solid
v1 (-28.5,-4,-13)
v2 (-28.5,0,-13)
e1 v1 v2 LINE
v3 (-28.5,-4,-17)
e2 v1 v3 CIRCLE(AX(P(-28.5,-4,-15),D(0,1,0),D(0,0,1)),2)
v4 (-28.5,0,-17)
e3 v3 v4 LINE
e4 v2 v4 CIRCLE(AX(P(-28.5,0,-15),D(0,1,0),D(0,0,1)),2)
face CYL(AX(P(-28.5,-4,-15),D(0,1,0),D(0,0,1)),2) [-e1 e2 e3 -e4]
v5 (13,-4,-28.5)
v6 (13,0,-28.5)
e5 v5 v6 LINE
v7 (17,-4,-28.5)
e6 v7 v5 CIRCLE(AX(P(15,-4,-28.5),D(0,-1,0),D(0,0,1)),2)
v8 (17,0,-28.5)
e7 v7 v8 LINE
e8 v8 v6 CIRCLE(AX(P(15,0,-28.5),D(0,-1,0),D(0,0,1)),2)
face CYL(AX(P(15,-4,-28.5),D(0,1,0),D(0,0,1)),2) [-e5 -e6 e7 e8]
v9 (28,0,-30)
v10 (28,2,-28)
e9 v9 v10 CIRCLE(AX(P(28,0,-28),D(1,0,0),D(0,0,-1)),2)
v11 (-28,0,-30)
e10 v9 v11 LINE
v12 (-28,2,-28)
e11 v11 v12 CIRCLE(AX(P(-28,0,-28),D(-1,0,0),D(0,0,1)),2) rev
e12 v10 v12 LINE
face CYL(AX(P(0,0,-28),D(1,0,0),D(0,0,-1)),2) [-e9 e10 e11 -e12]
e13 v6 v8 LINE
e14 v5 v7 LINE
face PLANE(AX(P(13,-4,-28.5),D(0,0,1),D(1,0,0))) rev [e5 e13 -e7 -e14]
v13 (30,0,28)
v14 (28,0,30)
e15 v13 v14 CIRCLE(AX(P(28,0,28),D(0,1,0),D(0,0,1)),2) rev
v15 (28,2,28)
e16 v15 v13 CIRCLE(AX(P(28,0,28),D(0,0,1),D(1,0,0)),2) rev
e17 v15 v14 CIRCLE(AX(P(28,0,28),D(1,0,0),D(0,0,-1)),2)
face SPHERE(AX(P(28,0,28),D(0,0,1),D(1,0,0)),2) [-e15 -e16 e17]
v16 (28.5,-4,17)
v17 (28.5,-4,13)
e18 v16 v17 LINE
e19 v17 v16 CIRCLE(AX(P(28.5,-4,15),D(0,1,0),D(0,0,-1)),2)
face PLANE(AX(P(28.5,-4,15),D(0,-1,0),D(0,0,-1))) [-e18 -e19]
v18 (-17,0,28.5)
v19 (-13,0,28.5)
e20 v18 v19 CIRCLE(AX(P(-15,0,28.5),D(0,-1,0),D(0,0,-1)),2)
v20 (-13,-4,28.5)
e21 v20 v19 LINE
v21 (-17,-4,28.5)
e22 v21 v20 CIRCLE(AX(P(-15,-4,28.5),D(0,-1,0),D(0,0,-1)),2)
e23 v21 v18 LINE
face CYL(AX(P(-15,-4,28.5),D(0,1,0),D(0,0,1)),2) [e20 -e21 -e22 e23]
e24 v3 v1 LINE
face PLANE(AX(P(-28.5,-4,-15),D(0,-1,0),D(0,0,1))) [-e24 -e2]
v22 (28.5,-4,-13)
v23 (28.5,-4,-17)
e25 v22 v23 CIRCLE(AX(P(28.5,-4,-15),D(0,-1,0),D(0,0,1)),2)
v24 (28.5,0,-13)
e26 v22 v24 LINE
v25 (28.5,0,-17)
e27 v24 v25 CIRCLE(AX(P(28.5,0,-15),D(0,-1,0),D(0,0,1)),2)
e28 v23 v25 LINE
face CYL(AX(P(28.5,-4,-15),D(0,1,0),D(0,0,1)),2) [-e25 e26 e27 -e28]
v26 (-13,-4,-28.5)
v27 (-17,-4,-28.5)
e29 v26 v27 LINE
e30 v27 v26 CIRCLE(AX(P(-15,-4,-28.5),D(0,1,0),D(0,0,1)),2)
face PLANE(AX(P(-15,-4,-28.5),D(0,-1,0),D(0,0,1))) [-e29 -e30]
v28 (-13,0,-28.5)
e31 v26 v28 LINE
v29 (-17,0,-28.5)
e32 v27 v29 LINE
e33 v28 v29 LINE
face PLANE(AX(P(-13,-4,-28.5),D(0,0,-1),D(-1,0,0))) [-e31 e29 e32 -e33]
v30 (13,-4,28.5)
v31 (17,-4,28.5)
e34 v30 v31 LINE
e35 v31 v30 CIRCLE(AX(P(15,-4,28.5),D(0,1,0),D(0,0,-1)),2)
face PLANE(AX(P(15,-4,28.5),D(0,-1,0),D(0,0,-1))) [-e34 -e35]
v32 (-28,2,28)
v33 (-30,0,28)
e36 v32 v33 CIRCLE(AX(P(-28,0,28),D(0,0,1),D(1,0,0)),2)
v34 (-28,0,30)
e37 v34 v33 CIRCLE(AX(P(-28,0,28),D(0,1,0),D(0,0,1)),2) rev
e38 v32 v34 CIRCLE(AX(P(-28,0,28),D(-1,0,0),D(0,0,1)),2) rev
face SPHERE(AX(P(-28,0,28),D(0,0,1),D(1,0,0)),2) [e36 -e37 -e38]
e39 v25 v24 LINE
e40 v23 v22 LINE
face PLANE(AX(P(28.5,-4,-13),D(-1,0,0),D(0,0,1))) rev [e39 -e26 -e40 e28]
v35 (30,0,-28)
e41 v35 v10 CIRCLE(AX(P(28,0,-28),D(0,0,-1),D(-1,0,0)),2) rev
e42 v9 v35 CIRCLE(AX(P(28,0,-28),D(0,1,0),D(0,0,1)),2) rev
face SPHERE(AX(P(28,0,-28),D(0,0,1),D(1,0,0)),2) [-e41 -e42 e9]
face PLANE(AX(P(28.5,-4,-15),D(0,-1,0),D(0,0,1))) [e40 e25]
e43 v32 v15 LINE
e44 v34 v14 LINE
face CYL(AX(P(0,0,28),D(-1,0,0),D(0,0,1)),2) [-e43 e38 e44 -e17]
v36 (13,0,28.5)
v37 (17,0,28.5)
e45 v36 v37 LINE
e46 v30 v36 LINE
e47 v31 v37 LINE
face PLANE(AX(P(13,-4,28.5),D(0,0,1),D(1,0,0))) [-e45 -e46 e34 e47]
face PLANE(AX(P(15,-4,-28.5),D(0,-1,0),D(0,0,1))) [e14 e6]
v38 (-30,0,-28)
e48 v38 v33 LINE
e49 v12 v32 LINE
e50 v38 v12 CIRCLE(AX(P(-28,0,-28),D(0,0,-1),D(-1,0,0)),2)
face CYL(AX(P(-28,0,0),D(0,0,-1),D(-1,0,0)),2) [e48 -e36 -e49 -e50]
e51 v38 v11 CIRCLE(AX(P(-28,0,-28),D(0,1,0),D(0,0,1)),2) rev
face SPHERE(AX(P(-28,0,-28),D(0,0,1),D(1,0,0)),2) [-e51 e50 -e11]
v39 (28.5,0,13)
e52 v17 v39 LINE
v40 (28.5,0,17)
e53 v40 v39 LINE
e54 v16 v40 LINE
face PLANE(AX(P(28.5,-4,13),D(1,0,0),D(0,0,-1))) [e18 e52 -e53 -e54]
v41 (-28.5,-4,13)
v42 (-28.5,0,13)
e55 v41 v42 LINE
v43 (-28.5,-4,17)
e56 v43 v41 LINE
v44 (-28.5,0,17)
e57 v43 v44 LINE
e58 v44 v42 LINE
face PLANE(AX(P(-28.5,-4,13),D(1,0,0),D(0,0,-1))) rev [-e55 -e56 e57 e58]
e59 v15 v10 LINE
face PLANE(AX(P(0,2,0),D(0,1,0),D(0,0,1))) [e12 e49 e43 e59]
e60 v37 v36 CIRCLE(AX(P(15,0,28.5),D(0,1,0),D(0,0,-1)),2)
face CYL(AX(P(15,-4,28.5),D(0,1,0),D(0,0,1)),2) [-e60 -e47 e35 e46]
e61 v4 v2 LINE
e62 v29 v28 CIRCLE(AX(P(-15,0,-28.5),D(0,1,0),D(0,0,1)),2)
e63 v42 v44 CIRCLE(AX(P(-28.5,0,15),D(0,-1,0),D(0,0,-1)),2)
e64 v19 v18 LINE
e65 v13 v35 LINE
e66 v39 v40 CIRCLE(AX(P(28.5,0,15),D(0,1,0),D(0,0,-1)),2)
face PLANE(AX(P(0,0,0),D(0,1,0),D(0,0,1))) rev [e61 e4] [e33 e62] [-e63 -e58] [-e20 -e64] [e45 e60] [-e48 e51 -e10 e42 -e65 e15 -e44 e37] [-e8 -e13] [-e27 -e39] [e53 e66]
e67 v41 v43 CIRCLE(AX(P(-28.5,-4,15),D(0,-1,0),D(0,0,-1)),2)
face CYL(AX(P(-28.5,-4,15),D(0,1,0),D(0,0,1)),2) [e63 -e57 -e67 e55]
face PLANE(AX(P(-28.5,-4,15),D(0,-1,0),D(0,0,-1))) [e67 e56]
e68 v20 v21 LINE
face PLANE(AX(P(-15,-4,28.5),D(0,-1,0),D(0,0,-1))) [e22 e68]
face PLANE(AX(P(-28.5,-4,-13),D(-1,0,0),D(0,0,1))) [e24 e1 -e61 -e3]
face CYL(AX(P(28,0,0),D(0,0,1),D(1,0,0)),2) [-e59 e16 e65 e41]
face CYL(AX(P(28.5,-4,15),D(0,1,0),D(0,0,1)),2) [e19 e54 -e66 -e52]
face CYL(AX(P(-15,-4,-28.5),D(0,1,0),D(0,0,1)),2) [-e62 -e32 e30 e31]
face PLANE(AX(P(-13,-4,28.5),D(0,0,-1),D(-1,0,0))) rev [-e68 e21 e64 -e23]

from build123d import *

# Parameters (mm, degrees)
SKETCH_1_W            = 60
SKETCH_1_H            = 60
EXTRUDE_1_DEPTH       = 2
EXTRUDE_2_DEPTH       = 4
MIRROR_2_COPY_1_DEPTH = 4
EXTRUDE_3_DEPTH       = 4
MIRROR_4_COPY_1_DEPTH = 4
FILLET_1_R            = 2


with BuildPart() as part:
    # 草图1 → 凸台-拉伸1 (new body)
    with BuildSketch(Plane(origin=(0, 0, 0), x_dir=(1, 0, 0), z_dir=(0, 1, 0))):
        Rectangle(SKETCH_1_W, SKETCH_1_H)
    extrude(amount=EXTRUDE_1_DEPTH)

    # 草图2 → 凸台-拉伸2 (add)
    with BuildSketch(Plane.XZ):
        with BuildLine():
            Line((-28.5, 13), (-28.5, 17))
            ThreePointArc((-28.5, 17), (-26.5, 15), (-28.5, 13))
        make_face()
    extrude_2 = extrude(amount=EXTRUDE_2_DEPTH)

    # 镜向1: 凸台-拉伸2 across plane
    add(extrude_2.mirror(Plane.XY))

    # 镜向2: 凸台-拉伸2 across plane
    add(extrude_2.mirror(Plane(origin=(0, 0, 0), x_dir=(0, 0, 1), z_dir=(1, 0, 0))))

    # 镜向2 copy 1 sketch → 镜向2 copy 1 (add)
    with BuildSketch(Plane(origin=(0, 0, 0), x_dir=(-1, 0, 0), z_dir=(0, -1, 0))):
        with BuildLine():
            Line((-28.5, 13), (-28.5, 17))
            ThreePointArc((-28.5, 17), (-26.5, 15), (-28.5, 13))
        make_face()
    extrude(amount=MIRROR_2_COPY_1_DEPTH)

    # 草图3 → 凸台-拉伸3 (add)
    with BuildSketch(Plane.XZ):
        with BuildLine():
            Line((-13, 28.5), (-17, 28.5))
            ThreePointArc((-17, 28.5), (-15, 26.5), (-13, 28.5))
        make_face()
    extrude_3 = extrude(amount=EXTRUDE_3_DEPTH)

    # 镜向3: 凸台-拉伸3 across plane
    add(extrude_3.mirror(Plane(origin=(0, 0, 0), x_dir=(0, 0, 1), z_dir=(1, 0, 0))))

    # 镜向4: 凸台-拉伸3 across plane
    add(extrude_3.mirror(Plane.XY))

    # 镜向4 copy 1 sketch → 镜向4 copy 1 (add)
    with BuildSketch(Plane(origin=(0, 0, 0), x_dir=(-1, 0, 0), z_dir=(0, -1, 0))):
        with BuildLine():
            Line((-13, 28.5), (-17, 28.5))
            ThreePointArc((-17, 28.5), (-15, 26.5), (-13, 28.5))
        make_face()
    extrude(amount=MIRROR_4_COPY_1_DEPTH)

    # 圆角1
    fillet_1_edges = [part.edges().sort_by_distance(p)[0] for p in [
        (0, 2, 30),
        (30, 2, 0),
        (0, 2, -30),
        (-30, 2, 0),
        (30, 1, -30),
        (30, 1, 30),
        (-30, 1, 30),
        (-30, 1, -30),
    ]]
    fillet(fillet_1_edges, radius=FILLET_1_R - 0.0001)  # a hair under: the kernel refuses the full size


solid = part.part
